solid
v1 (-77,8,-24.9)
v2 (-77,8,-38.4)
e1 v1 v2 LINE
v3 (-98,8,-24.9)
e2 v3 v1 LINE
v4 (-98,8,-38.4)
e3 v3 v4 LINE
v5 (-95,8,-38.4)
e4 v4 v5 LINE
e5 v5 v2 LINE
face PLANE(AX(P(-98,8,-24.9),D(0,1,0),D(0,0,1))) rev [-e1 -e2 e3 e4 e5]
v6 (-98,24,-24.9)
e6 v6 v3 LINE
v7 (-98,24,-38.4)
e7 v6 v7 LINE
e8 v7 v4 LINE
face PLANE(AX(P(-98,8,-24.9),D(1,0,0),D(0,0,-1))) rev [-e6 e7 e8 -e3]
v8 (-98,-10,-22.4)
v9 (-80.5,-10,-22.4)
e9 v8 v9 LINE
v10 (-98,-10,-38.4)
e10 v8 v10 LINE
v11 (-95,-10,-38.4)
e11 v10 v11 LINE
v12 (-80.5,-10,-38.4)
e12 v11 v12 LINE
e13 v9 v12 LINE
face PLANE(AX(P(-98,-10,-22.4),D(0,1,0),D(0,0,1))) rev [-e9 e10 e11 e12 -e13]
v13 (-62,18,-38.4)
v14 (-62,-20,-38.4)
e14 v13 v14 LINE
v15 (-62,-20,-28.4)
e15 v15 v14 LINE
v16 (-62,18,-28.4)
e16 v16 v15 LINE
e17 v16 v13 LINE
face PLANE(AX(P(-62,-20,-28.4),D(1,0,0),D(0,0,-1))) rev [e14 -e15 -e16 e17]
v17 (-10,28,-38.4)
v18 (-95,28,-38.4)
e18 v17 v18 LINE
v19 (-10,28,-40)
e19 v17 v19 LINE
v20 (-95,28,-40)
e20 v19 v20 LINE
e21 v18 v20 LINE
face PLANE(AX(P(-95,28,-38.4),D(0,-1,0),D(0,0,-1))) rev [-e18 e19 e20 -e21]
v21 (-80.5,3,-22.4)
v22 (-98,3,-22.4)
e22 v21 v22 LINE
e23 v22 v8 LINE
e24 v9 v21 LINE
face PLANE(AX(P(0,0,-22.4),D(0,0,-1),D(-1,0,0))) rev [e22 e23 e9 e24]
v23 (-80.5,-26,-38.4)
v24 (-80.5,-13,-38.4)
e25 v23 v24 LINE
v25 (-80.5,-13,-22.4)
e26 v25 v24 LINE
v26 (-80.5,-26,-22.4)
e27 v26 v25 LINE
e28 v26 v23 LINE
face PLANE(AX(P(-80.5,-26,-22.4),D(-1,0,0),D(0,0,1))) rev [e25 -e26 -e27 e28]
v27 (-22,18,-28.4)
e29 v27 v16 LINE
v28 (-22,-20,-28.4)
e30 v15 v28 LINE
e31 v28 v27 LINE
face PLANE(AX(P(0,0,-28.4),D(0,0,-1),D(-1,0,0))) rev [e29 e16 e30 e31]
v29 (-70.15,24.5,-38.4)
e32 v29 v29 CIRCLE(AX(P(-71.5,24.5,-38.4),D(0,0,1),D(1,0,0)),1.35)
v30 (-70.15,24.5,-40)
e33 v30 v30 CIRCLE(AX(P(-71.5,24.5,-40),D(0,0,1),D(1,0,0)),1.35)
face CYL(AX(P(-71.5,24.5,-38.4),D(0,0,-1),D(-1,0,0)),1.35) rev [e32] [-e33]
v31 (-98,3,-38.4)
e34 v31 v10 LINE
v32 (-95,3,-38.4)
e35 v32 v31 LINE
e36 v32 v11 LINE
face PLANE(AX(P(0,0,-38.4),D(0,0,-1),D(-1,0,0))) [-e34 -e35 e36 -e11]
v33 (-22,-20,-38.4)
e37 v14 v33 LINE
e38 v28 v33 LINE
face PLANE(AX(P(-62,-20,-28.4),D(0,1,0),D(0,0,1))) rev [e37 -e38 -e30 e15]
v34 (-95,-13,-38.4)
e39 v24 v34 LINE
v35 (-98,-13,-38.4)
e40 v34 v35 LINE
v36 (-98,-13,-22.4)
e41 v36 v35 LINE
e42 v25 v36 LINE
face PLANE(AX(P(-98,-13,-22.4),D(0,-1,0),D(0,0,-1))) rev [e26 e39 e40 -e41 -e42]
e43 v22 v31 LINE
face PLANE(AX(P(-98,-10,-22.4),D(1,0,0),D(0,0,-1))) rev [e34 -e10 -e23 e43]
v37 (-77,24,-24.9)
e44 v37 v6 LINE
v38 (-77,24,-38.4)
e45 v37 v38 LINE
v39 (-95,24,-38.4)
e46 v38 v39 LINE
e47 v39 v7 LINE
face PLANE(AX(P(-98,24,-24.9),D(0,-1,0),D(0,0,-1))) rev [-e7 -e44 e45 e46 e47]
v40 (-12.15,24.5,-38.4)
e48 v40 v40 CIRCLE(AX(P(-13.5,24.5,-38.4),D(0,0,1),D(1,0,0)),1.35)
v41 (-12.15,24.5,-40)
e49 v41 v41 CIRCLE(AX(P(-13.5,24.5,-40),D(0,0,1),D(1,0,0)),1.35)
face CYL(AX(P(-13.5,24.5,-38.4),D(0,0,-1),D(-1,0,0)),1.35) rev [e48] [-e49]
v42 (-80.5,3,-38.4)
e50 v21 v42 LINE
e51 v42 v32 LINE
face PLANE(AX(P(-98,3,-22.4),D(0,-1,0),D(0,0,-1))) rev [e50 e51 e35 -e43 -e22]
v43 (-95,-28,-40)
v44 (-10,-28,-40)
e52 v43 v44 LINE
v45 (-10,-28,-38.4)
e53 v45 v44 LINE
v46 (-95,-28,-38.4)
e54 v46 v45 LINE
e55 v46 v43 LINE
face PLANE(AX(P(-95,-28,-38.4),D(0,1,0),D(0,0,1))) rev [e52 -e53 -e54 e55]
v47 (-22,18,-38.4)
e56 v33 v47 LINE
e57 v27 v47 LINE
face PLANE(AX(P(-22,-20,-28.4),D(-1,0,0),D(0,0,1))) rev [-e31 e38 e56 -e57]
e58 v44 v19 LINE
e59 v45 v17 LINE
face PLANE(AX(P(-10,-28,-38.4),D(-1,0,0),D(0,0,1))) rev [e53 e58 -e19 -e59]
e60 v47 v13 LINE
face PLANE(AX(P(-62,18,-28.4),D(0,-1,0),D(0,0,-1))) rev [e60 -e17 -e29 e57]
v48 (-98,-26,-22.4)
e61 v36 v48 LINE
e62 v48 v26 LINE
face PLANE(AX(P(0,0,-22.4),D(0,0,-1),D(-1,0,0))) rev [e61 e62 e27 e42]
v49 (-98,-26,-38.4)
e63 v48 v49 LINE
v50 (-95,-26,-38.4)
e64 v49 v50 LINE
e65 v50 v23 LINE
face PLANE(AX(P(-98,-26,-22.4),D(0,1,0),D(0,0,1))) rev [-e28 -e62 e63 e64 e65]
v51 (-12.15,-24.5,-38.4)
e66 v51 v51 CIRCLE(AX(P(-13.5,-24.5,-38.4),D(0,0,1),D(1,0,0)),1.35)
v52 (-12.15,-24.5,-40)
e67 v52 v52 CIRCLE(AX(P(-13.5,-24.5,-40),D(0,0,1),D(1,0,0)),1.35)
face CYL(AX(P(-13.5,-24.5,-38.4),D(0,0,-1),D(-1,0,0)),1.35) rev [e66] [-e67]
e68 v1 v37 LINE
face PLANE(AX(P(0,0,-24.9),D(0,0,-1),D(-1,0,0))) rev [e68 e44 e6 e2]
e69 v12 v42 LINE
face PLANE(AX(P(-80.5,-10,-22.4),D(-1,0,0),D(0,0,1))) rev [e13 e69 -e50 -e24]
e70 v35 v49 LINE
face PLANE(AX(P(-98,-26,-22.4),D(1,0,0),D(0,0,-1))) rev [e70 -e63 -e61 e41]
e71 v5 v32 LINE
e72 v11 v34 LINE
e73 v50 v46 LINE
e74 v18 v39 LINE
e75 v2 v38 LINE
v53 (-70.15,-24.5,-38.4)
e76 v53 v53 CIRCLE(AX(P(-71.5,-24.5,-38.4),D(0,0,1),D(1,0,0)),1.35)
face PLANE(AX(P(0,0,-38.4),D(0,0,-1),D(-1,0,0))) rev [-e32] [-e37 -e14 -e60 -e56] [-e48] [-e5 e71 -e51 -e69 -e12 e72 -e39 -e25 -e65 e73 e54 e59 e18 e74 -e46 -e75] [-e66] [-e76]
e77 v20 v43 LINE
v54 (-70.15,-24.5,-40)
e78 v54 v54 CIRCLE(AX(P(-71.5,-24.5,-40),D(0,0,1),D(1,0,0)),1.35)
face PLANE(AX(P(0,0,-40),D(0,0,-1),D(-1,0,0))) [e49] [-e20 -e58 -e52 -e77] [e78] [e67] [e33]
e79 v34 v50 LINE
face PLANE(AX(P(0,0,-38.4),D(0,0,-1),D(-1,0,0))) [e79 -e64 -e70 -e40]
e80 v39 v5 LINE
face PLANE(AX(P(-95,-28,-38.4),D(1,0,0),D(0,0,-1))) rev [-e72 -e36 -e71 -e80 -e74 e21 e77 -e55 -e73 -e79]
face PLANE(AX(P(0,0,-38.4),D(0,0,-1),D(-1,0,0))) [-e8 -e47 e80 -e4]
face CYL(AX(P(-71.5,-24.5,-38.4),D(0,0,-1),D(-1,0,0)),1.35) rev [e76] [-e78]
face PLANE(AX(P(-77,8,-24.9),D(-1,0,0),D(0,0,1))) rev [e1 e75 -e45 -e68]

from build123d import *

# Parameters (mm, degrees)
PCB_START                  = -40
SK_PCB_W                   = 85
SK_PCB_H                   = 56
PCB_DEPTH                  = 1.6
BARRENOS_M2_5_START        = -40
SK_BARRENOS_M2_5_R         = 1.35
BARRENOS_M2_5_DEPTH        = 1.6
ETHERNET_START             = -38.4
SK_ETHERNET_W              = 21
SK_ETHERNET_H              = 16
ETHERNET_DEPTH             = 13.5
USB_START                  = -38.4
SK_USB_W                   = 17.5
SK_USB_H                   = 13
USB_DEPTH                  = 16
DISIPADOR_VENTILADOR_START = -38.4
SK_DISIPADOR_VENTILADOR_W  = 40
SK_DISIPADOR_VENTILADOR_H  = 38
DISIPADOR_VENTILADOR_DEPTH = 10


with BuildPart() as part:
    # Sk_PCB → PCB (new body)
    with BuildSketch(Plane.XY.offset(PCB_START)):
        with Locations((-52.5, 0)):
            Rectangle(SK_PCB_W, SK_PCB_H)
    extrude(amount=PCB_DEPTH)

    # Sk_Barrenos_M2-5 → Barrenos_M2-5 (cut)
    with BuildSketch(Plane.XY.offset(BARRENOS_M2_5_START)):
        with Locations((-13.5, -24.5)):
            Circle(SK_BARRENOS_M2_5_R)
        with Locations((-13.5, 24.5)):
            Circle(SK_BARRENOS_M2_5_R)
        with Locations((-71.5, -24.5)):
            Circle(SK_BARRENOS_M2_5_R)
        with Locations((-71.5, 24.5)):
            Circle(SK_BARRENOS_M2_5_R)
    extrude(amount=BARRENOS_M2_5_DEPTH, mode=Mode.SUBTRACT)

    # Sk_Ethernet → Ethernet (add)
    with BuildSketch(Plane.XY.offset(ETHERNET_START)):
        with Locations((-87.5, 16)):
            Rectangle(SK_ETHERNET_W, SK_ETHERNET_H)
    extrude(amount=ETHERNET_DEPTH)

    # Sk_USB → USB (add)
    with BuildSketch(Plane.XY.offset(USB_START)):
        with Locations((-89.25, -19.5)):
            Rectangle(SK_USB_W, SK_USB_H)
        with Locations((-89.25, -3.5)):
            Rectangle(SK_USB_W, SK_USB_H)
    extrude(amount=USB_DEPTH)

    # Sk_Disipador_ventilador → Disipador_ventilador (add)
    with BuildSketch(Plane.XY.offset(DISIPADOR_VENTILADOR_START)):
        with Locations((-42, -1)):
            Rectangle(SK_DISIPADOR_VENTILADOR_W, SK_DISIPADOR_VENTILADOR_H)
    extrude(amount=DISIPADOR_VENTILADOR_DEPTH)


solid = part.part
